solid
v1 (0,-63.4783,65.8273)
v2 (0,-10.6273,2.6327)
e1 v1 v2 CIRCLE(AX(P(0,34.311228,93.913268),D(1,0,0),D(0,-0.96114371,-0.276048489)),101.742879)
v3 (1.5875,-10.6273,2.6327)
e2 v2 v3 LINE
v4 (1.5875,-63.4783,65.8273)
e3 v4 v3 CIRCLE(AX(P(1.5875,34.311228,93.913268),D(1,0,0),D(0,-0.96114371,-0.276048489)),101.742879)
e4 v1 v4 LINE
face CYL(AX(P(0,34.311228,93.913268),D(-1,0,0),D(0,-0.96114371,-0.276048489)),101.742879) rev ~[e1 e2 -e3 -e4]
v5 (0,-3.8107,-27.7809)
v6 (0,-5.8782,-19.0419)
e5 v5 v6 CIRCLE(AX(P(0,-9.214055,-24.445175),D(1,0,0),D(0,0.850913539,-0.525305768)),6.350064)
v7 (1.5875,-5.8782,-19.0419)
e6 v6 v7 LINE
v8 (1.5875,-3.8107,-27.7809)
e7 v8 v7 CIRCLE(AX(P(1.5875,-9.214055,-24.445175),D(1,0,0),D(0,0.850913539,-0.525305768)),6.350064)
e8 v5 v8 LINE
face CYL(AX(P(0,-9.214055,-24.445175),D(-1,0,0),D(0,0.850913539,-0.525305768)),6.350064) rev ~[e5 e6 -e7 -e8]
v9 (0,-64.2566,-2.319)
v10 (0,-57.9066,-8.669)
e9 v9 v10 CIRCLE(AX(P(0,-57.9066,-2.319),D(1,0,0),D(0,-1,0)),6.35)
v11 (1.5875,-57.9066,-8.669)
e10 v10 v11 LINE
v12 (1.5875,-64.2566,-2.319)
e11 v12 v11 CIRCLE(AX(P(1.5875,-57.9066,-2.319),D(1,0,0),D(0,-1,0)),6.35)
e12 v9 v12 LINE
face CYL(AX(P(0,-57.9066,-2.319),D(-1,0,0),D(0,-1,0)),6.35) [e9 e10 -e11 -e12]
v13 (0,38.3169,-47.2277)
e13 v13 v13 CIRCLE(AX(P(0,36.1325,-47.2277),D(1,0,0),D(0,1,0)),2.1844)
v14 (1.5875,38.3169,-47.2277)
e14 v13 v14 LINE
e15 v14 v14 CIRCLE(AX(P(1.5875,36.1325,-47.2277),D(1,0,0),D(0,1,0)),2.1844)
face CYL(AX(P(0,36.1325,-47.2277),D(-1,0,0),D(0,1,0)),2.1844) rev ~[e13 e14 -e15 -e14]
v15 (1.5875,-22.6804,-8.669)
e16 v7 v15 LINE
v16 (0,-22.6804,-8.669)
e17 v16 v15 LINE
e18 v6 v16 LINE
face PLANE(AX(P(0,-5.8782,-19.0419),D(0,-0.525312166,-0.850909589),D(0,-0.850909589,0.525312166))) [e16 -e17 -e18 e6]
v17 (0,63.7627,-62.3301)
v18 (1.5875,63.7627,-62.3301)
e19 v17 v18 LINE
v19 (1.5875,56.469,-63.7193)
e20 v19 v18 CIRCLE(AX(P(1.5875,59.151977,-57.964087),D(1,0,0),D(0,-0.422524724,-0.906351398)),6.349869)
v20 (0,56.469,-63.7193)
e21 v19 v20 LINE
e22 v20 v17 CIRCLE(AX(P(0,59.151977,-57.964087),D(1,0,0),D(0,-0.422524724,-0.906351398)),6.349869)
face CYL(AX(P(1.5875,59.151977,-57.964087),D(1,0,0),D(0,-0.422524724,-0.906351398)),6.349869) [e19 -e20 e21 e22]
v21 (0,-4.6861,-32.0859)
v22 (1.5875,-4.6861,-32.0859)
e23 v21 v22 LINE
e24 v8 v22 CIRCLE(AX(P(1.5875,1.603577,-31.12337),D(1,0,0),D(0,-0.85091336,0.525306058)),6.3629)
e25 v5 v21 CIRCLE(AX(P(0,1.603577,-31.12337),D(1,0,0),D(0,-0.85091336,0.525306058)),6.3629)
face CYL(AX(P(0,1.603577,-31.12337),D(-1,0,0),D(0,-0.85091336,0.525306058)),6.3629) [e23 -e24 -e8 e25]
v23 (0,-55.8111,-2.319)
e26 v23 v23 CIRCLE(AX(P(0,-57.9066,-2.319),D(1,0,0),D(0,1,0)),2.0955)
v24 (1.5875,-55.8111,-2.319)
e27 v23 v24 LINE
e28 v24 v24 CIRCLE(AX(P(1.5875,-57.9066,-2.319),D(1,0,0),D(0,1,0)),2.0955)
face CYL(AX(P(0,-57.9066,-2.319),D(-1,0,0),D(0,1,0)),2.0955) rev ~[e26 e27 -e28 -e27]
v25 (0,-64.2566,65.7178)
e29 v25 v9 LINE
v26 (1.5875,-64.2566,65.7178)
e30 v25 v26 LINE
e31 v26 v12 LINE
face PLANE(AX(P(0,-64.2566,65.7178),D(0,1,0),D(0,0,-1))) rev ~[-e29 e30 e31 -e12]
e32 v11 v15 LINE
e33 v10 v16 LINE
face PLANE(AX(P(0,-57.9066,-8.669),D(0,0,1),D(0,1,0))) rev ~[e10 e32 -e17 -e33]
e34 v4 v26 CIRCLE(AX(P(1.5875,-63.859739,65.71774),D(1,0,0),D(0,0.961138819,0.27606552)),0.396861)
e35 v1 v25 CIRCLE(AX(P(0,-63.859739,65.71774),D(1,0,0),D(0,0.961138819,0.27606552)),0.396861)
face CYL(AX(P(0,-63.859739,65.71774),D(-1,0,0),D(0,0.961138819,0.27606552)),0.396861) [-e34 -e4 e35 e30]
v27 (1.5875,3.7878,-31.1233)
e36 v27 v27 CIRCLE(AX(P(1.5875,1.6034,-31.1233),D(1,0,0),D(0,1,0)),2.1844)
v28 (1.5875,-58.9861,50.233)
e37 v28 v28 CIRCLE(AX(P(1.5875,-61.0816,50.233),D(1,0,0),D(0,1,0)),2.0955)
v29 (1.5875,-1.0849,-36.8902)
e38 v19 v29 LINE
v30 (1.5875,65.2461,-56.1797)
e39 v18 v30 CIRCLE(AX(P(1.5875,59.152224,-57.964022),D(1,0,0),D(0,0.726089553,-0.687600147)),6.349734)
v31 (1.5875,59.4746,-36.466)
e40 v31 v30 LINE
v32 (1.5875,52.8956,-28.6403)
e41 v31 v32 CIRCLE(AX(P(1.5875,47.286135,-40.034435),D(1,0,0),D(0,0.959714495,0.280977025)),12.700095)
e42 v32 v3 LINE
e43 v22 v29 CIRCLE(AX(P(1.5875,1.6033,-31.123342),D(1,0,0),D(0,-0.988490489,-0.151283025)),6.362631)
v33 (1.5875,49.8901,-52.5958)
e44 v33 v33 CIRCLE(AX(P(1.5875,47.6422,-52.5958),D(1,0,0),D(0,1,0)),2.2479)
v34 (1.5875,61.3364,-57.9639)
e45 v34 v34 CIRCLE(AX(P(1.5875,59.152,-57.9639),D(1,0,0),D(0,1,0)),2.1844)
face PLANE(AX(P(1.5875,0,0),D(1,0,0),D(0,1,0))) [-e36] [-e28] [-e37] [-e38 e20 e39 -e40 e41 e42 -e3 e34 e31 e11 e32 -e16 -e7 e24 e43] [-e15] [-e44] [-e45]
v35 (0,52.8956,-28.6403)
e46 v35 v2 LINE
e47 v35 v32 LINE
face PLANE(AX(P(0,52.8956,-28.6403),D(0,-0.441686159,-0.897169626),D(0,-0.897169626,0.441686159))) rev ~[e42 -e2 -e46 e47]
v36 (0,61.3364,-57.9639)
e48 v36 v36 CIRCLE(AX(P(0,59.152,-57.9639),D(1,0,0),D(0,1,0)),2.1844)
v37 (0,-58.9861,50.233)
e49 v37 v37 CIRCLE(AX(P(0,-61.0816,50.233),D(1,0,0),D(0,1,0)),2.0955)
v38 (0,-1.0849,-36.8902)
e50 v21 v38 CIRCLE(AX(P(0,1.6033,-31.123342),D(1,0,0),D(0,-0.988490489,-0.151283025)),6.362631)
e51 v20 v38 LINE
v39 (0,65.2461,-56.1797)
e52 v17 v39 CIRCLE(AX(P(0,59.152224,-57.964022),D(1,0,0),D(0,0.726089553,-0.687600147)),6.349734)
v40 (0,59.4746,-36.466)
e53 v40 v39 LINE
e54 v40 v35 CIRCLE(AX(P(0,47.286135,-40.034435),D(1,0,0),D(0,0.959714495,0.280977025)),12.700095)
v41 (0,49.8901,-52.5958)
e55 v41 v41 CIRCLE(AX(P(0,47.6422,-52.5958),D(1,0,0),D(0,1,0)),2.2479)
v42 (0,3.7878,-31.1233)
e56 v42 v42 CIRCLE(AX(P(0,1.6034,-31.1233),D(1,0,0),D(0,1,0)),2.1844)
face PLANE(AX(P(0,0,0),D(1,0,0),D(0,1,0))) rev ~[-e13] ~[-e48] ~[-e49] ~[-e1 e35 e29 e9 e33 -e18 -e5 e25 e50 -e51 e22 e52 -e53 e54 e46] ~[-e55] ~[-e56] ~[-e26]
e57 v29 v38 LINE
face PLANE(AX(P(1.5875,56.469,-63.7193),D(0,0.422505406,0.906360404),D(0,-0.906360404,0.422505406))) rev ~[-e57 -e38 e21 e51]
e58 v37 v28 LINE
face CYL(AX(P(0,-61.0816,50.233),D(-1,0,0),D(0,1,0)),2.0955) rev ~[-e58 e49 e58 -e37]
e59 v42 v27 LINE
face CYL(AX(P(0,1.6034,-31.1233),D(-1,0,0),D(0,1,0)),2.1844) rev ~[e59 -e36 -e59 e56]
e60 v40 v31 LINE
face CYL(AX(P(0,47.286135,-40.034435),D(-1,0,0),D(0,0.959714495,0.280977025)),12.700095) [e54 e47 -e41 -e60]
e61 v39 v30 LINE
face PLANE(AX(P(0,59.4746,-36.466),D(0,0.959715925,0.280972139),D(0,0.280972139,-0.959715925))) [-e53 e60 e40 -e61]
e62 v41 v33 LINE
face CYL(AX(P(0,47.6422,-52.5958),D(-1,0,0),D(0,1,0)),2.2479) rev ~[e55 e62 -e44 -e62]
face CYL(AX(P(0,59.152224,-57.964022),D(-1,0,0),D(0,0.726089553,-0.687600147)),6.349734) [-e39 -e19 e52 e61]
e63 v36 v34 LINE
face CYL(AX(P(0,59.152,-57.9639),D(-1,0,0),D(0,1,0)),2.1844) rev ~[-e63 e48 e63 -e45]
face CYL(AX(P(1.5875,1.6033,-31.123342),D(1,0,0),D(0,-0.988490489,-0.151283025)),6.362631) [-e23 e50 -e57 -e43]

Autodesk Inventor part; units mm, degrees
ref_plane "YZ Plane" through (0, 0, 0) normal (1, 0, 0) x (0, 1, 0)
ref_plane "XZ Plane" through (0, 0, 0) normal (0, 1, 0) x (-1, 0, 0)
ref_plane "XY Plane" through (0, 0, 0) normal (0, 0, 1) x (1, 0, 0)
sketch "main" plane through (0, 0, 0) normal (0, 0, 1) x (1, 0, 0)
  circle A0 centre (31.5379, -87.1249) radius 2.0955
  circle A1 centre (8.5185, -76.3887) radius 2.0955
  line L0 (52.8956, -28.6403) -> (-10.6273, 2.6327)
  circle A2 centre (1.6034, -31.1233) radius 2.1844
  arc A3 (-63.4783, 65.8273) -> (-10.6273, 2.6327) centre (34.3111, 93.9132) ccw
  line L1 (-57.9066, -8.669) -> (-22.6804, -8.669)
  circle A4 centre (59.152, -57.9639) radius 2.1844
  line L2 (59.4746, -36.466) -> (65.2461, -56.1797)
  arc A5 (63.7627, -62.3301) -> (65.2461, -56.1797) centre (59.152, -57.9639) ccw
  line L3 (-64.2566, 65.7178) -> (-64.2566, -2.319)
  line L4 (-64.2566, 68.6882) -> (6.9552, 68.6882) construction
  arc A6 (-64.2566, -2.319) -> (-57.9066, -8.669) centre (-57.9066, -2.319) ccw
  circle A7 centre (20.0282, -81.7568) radius 2.0955
  arc A8 (28.8539, -92.8798) -> (36.1487, -91.4911) centre (31.5379, -87.1249) ccw
  line L5 (28.8539, -92.8798) -> (5.8344, -82.1435)
  line L6 (36.1487, -91.4911) -> (63.7627, -62.3301)
  circle A9 centre (47.6422, -52.5958) radius 2.2479
  arc A10 (-63.4783, 65.8273) -> (-64.2566, 65.7178) centre (-63.8597, 65.7178) ccw
  arc A11 (59.4746, -36.466) -> (52.8956, -28.6403) centre (47.2862, -40.0344) ccw
  circle A12 centre (36.1325, -47.2277) radius 2.1844
  arc A13 (-3.8107, -27.7809) -> (-4.6861, -32.0859) centre (1.6034, -31.1233) ccw
  line L7 (-3.8107, -27.7809) -> (-3.8107, -27.7809)
  line L8 (-5.8782, -19.0419) -> (-22.6804, -8.669)
  arc A14 (-3.8107, -27.7809) -> (-5.8782, -19.0419) centre (-9.2139, -24.4452) ccw
  circle A15 centre (-61.0816, 50.233) radius 2.0955
  circle A16 centre (-57.9066, -2.319) radius 2.0955
  arc A17 (2.2416, -77.3494) -> (5.8344, -82.1435) centre (8.5185, -76.3887) ccw
  line L9 (2.2416, -77.3494) -> (-4.6861, -32.0859)
  point P0 (22.7298, -27.8341)
  point P1 (-67.4316, 93.9132)
  point P2 (-64.2566, -8.669)
  point P3 (57.9062, -31.1089)
  point P4 (57.9062, -31.1089)
  point P5 (-0.4749, -22.3776)
  point P6 (-1.0693, -36.8975)
  dimension "d4" = 12.7
  dimension "d5" = 4.191
  dimension "d6" = 25.4
  dimension "d10" = 6.35
  dimension "d11" = 4.191
  dimension "d12" = 12.7
  dimension "d14" = 4.4958
  dimension "d23" = 0.3969
  dimension "d25" = 12.7
  dimension "d26" = 12.7
  dimension "d27" = 4.3688
  dimension "d28" = 6.35
  dimension "d29" = 6.35
  dimension "d31" = 4.191
  dimension "d33" = 4.191
  dimension "d35" = 12.7
  dimension "d36" = 12.7
  dimension "d37" = 38.1
  dimension "d38" = 12.7
sketch "Sketch1" plane through (0, 0, 0) normal (1, 0, 0) x (0, 1, 0)
  circle A0 centre (31.5379, -87.1249) radius 2.0955
  circle A1 centre (8.5185, -76.3887) radius 2.0955
  line L0 (52.8956, -28.6403) -> (-10.6273, 2.6327)
  circle A2 centre (1.6034, -31.1233) radius 2.1844
  arc A3 (-63.4783, 65.8273) -> (-10.6273, 2.6327) centre (34.3111, 93.9132) ccw
  line L1 (-57.9066, -8.669) -> (-22.6804, -8.669)
  circle A4 centre (59.152, -57.9639) radius 2.1844
  line L2 (59.4746, -36.466) -> (65.2461, -56.1797)
  arc A5 (63.7627, -62.3301) -> (65.2461, -56.1797) centre (59.152, -57.9639) ccw
  line L3 (-64.2566, 65.7178) -> (-64.2566, -2.319)
  line L4 (-64.2566, 68.6882) -> (6.9552, 68.6882) construction
  arc A6 (-64.2566, -2.319) -> (-57.9066, -8.669) centre (-57.9066, -2.319) ccw
  circle A7 centre (20.0282, -81.7568) radius 2.0955
  arc A8 (28.8539, -92.8798) -> (36.1487, -91.4911) centre (31.5379, -87.1249) ccw
  line L5 (28.8539, -92.8798) -> (5.8344, -82.1435)
  line L6 (36.1487, -91.4911) -> (63.7627, -62.3301)
  circle A9 centre (47.6422, -52.5958) radius 2.2479
  arc A10 (-63.4783, 65.8273) -> (-64.2566, 65.7178) centre (-63.8597, 65.7178) ccw
  arc A11 (59.4746, -36.466) -> (52.8956, -28.6403) centre (47.2862, -40.0344) ccw
  circle A12 centre (36.1325, -47.2277) radius 2.1844
  arc A13 (-3.8107, -27.7809) -> (-4.6861, -32.0859) centre (1.6034, -31.1233) ccw
  line L7 (-3.8107, -27.7809) -> (-3.8107, -27.7809)
  line L8 (-5.8782, -19.0419) -> (-22.6804, -8.669)
  arc A14 (-3.8107, -27.7809) -> (-5.8782, -19.0419) centre (-9.2139, -24.4452) ccw
  circle A15 centre (-61.0816, 50.233) radius 2.0955
  circle A16 centre (-57.9066, -2.319) radius 2.0955
  arc A17 (2.2416, -77.3494) -> (5.8344, -82.1435) centre (8.5185, -76.3887) ccw
  line L9 (2.2416, -77.3494) -> (-4.6861, -32.0859)
  point P0 (0, 0)
extrude "Extrusion2" add sketch "Sketch1" along normal blind 1.5875
sketch "Sketch2" plane through (1.5875, 0, 0) normal (1, 0, 0) x (0, 0, -1)
  line L0 (82.1435, 5.8344) -> (92.8798, 28.8539) projected
  arc A0 (77.3494, 2.2416) -> (82.1435, 5.8344) centre (76.3887, 8.5185) ccw projected
  line L1 (91.4911, 36.1487) -> (62.3301, 63.7627) projected
  arc A1 (92.8798, 28.8539) -> (91.4911, 36.1487) centre (87.1249, 31.5379) ccw projected
  circle A2 centre (57.9639, 59.152) radius 2.1844 projected
  arc A3 (63.7193, 56.469) -> (62.3301, 63.7627) centre (57.9639, 59.152) ccw
  circle A4 centre (31.1233, 1.6034) radius 2.1844 projected
  arc A5 (32.0859, -4.6861) -> (36.8902, -1.0849) centre (31.1233, 1.6034) ccw
  line L2 (63.7193, 56.469) -> (36.8902, -1.0849)
  line L3 (32.0859, -4.6861) -> (77.3494, 2.2416) projected
  point P0 (0, 0)
extrude "Extrusion3" cut sketch "Sketch2" against normal blind 25.4 contours A0 L3 A5 L2 A3 L1 A1 L0
equation "\"BendRadius\" = Thickness"
equation "\"BendReliefWidth\" = Thickness"
equation "\"BendReliefDepth\" = 0.5 * Thickness"
equation "\"CornerReliefSize\" = 4 * Thickness"
equation "\"MinimumRemnant\" = 2 * Thickness"
equation "\"TransitionRadius\" = BendRadius"
equation "\"JacobiRadiusSize\" = BendRadius"
equation "\"GapSize\" = Thickness"
equation "\"Thickness\" = 1.5875"
properties part number "Ramp" material "Acetal Resin, White"
